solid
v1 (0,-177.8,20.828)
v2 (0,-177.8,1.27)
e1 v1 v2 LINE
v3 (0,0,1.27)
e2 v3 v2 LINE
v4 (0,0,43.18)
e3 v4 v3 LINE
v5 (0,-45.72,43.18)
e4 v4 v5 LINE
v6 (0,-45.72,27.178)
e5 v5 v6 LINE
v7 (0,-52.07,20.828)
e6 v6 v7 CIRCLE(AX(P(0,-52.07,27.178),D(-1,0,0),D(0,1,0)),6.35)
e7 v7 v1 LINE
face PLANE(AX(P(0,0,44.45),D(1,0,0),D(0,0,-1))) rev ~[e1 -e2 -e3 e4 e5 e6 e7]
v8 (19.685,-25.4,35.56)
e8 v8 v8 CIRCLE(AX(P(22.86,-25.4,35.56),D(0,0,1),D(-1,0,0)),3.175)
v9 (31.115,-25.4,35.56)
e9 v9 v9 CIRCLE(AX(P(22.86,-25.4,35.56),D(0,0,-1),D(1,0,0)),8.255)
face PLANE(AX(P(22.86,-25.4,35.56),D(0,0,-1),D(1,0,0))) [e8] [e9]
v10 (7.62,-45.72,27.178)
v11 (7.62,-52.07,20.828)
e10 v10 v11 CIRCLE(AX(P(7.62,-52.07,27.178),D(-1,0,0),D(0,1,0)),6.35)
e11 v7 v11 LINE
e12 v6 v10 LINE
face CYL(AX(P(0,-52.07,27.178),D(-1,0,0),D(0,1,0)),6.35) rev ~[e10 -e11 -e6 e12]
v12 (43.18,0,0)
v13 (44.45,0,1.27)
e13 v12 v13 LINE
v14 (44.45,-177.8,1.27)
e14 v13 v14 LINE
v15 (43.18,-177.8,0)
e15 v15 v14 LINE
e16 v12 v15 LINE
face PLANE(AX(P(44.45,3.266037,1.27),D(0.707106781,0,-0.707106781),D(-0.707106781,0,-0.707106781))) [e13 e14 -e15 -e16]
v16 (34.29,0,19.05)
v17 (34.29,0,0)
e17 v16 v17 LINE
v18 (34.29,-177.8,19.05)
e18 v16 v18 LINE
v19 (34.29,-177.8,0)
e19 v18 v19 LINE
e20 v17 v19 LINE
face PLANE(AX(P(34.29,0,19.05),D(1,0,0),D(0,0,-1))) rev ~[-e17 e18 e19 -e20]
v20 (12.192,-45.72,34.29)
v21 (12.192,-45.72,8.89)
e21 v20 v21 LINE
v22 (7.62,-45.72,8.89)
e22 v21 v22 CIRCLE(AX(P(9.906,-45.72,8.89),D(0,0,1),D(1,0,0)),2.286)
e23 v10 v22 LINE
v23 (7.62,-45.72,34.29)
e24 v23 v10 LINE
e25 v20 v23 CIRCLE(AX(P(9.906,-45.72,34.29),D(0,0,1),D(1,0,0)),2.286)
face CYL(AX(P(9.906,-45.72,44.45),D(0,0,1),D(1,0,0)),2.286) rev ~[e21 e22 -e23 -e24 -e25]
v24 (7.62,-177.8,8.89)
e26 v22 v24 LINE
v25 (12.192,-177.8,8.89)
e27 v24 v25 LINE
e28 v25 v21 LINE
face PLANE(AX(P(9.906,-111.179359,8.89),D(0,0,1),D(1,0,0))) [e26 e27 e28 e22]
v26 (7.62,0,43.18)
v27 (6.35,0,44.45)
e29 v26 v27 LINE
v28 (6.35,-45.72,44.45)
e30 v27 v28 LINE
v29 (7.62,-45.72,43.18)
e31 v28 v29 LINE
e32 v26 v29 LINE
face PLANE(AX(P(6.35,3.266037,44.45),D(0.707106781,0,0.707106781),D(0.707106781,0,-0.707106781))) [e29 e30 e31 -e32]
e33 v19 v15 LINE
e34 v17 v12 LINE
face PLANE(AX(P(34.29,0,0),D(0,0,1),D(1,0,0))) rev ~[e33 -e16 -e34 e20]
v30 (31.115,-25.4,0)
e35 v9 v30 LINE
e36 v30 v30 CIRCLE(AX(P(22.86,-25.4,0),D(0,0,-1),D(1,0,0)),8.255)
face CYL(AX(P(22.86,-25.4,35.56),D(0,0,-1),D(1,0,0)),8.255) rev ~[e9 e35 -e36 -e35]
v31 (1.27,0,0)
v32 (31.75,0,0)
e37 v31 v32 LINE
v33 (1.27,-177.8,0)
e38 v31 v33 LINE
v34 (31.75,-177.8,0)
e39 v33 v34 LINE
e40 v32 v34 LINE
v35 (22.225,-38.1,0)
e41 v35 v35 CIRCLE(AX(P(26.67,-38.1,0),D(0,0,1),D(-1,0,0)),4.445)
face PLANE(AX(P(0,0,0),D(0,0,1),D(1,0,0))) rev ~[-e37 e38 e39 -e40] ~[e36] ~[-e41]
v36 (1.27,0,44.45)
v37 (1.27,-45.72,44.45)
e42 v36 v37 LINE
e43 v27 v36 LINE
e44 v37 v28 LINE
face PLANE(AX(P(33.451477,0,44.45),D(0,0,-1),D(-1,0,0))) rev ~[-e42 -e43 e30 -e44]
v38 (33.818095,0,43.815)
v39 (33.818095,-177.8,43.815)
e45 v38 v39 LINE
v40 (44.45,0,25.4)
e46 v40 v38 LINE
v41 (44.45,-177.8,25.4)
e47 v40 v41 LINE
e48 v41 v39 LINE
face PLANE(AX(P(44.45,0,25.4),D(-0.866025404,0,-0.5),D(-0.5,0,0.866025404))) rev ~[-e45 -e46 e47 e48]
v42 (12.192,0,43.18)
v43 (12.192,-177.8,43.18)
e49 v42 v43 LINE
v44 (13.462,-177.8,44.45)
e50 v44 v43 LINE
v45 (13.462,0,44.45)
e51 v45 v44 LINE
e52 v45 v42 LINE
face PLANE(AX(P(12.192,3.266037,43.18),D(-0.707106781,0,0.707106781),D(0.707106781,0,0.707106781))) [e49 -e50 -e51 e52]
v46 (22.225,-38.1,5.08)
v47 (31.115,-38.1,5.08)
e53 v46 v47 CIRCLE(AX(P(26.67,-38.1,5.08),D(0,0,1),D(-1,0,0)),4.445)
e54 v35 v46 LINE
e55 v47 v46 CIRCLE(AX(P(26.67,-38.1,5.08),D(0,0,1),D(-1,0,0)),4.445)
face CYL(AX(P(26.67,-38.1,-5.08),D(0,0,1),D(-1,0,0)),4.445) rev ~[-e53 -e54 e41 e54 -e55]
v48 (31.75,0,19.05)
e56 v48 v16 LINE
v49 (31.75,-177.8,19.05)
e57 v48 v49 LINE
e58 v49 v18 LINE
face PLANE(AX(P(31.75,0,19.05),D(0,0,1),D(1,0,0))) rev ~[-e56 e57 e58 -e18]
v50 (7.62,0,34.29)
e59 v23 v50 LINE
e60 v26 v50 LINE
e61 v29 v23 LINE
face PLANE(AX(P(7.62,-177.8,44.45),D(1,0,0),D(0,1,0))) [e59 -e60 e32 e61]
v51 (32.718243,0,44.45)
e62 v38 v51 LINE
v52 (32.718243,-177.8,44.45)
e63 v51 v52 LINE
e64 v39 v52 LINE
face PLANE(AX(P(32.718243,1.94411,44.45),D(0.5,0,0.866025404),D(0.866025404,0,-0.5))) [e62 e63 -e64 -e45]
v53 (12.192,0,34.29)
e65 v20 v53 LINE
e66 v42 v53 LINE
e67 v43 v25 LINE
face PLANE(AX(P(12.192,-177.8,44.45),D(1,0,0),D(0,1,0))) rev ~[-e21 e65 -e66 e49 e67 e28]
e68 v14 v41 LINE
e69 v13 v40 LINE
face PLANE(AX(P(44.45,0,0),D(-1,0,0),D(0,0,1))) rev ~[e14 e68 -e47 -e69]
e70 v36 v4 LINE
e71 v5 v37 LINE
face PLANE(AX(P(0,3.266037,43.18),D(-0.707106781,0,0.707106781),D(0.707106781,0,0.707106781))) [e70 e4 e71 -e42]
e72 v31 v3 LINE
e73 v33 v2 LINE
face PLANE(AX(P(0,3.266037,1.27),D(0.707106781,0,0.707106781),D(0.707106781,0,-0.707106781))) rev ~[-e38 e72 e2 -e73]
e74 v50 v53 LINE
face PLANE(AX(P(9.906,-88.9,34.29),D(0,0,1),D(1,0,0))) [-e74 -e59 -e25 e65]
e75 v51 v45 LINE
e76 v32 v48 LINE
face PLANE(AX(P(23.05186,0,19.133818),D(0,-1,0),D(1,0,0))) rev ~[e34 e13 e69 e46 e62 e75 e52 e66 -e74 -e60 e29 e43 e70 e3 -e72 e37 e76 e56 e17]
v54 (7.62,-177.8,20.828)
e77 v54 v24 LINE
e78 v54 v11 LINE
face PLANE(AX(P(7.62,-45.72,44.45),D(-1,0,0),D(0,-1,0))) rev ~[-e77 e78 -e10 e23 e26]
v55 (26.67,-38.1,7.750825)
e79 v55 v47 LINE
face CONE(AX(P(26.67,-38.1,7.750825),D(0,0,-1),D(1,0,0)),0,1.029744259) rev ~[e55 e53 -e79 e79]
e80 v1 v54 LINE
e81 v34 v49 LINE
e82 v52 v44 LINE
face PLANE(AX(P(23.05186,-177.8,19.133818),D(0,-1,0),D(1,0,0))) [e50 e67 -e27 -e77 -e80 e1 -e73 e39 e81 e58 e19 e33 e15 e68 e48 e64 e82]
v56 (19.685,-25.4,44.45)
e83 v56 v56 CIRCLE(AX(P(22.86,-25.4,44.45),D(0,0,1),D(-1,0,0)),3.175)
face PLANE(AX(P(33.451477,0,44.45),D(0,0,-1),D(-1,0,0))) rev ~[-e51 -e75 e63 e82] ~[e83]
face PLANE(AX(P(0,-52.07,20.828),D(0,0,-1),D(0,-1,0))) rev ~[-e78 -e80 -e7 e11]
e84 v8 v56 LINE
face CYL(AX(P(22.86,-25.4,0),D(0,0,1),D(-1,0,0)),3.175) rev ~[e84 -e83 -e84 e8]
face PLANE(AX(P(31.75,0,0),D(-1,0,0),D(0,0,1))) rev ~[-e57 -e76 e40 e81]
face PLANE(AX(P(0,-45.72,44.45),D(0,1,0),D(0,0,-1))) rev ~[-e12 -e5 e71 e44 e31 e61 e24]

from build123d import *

# Parameters (mm, degrees)
F1_DEPTH        = 177.8
F3_DEPTH        = 9.906
F4_W            = 4.572
F4_H            = 177.8
F5_DEPTH        = 10.16
F7_DEPTH        = 35.56
F9_D            = 8.89
F9_DEPTH        = 5.08
F9_TIP          = 2.6708254516
F10_D           = 6.35
F10_CBORE_D     = 16.51
F10_CBORE_DEPTH = 35.56
F11_T1_DEPTH    = 184.3320747894
F11_T3_DEPTH    = 52.2520747894
F11_T5_DEPTH    = 181.6882193011


# Not quite as in the source:
# - a fillet or chamfer that OpenCascade refuses, or shapes differently, is made with other operations: its cross-section is extruded or revolved along the edge and cut away or added


with BuildPart() as f1:
    # F0 (on Front) → F1 (new body)
    with BuildSketch(Plane.XZ):
        Polygon((0, 44.45), (0, 0), (31.75, 0), (31.75, 19.05), (34.29, 19.05), (34.29, 0), (44.45, 0), (44.45, 25.4), (33.4514773719, 44.45), align=None)
    extrude(amount=F1_DEPTH)

    # F2 (on face) → F3 (cut)
    with BuildSketch(Plane(origin=(0, 0, 0), x_dir=(0, -1, 0), z_dir=(-1, 0, 0))):
        with BuildLine():
            Line((177.8, 20.828), (177.8, 44.45))
            Line((177.8, 44.45), (45.72, 44.45))
            Line((45.72, 44.45), (45.72, 27.178))
            ThreePointArc((45.72, 27.178), (47.5798719395, 22.6878719395), (52.07, 20.828))
            Line((52.07, 20.828), (177.8, 20.828))
        make_face()
    extrude(amount=-F3_DEPTH, mode=Mode.SUBTRACT)

    # F4 (on face) → F5 (cut)
    with BuildSketch(Plane.XY.offset(44.45)):
        with Locations((9.906, -88.9)):
            Rectangle(F4_W, F4_H)
    extrude(amount=-F5_DEPTH, mode=Mode.SUBTRACT)

    # F6 (on face) → F7 (cut)
    with BuildSketch(Plane.XY.offset(44.45)):
        with BuildLine():
            Line((7.62, -177.8), (12.192, -177.8))
            Line((12.192, -177.8), (12.192, -45.72))
            ThreePointArc((12.192, -45.72), (9.906, -43.434), (7.62, -45.72))
            Line((7.62, -45.72), (7.62, -177.8))
        make_face()
    extrude(amount=-F7_DEPTH, mode=Mode.SUBTRACT)

    # F9
    with Locations(Plane(origin=(0, 0, 0), x_dir=(1, 0, 0), z_dir=(0, 0, -1))):
        with Locations((26.67, 38.1)):
            Hole(F9_D / 2, depth=F9_DEPTH)
            with Locations((0, 0, -(F9_DEPTH + F9_TIP / 2))):  # 118° drill point
                Cone(0, F9_D / 2, F9_TIP, mode=Mode.SUBTRACT)

    # F10 (through all)
    with Locations(Plane(origin=(0, 0, 0), x_dir=(1, 0, 0), z_dir=(0, 0, -1))):
        with Locations((22.86, 25.4)):
            CounterBoreHole(F10_D / 2, F10_CBORE_D / 2, F10_CBORE_DEPTH)

    # F11: chamfer of 1.27 on 6 edges, made by hand

    # F11_s2 → F11_t1 (cut)
    with BuildSketch(Plane.XZ.offset(-3.2660373947)):
        Polygon((12.192, 43.18), (13.462, 44.45), (12.192, 44.45), align=None)
        Polygon((0, 1.27), (1.27, 0), (0, 0), align=None)
        Polygon((44.45, 1.27), (43.18, 0), (44.45, 0), align=None)
    extrude(amount=F11_T1_DEPTH, mode=Mode.SUBTRACT)

    # F11_s4 → F11_t3 (cut)
    with BuildSketch(Plane.XZ.offset(-3.2660373947)):
        Polygon((6.35, 44.45), (7.62, 43.18), (7.62, 44.45), align=None)
        Polygon((0, 43.18), (1.27, 44.45), (0, 44.45), align=None)
    extrude(amount=F11_T3_DEPTH, mode=Mode.SUBTRACT)

    # F11_s6 → F11_t5 (cut)
    with BuildSketch(Plane.XZ.offset(-1.9441096505)):
        Polygon((32.7182425301, 44.45), (33.8180947929, 43.815), (33.4514773719, 44.45), align=None)
    extrude(amount=F11_T5_DEPTH, mode=Mode.SUBTRACT)


solid = f1.part
